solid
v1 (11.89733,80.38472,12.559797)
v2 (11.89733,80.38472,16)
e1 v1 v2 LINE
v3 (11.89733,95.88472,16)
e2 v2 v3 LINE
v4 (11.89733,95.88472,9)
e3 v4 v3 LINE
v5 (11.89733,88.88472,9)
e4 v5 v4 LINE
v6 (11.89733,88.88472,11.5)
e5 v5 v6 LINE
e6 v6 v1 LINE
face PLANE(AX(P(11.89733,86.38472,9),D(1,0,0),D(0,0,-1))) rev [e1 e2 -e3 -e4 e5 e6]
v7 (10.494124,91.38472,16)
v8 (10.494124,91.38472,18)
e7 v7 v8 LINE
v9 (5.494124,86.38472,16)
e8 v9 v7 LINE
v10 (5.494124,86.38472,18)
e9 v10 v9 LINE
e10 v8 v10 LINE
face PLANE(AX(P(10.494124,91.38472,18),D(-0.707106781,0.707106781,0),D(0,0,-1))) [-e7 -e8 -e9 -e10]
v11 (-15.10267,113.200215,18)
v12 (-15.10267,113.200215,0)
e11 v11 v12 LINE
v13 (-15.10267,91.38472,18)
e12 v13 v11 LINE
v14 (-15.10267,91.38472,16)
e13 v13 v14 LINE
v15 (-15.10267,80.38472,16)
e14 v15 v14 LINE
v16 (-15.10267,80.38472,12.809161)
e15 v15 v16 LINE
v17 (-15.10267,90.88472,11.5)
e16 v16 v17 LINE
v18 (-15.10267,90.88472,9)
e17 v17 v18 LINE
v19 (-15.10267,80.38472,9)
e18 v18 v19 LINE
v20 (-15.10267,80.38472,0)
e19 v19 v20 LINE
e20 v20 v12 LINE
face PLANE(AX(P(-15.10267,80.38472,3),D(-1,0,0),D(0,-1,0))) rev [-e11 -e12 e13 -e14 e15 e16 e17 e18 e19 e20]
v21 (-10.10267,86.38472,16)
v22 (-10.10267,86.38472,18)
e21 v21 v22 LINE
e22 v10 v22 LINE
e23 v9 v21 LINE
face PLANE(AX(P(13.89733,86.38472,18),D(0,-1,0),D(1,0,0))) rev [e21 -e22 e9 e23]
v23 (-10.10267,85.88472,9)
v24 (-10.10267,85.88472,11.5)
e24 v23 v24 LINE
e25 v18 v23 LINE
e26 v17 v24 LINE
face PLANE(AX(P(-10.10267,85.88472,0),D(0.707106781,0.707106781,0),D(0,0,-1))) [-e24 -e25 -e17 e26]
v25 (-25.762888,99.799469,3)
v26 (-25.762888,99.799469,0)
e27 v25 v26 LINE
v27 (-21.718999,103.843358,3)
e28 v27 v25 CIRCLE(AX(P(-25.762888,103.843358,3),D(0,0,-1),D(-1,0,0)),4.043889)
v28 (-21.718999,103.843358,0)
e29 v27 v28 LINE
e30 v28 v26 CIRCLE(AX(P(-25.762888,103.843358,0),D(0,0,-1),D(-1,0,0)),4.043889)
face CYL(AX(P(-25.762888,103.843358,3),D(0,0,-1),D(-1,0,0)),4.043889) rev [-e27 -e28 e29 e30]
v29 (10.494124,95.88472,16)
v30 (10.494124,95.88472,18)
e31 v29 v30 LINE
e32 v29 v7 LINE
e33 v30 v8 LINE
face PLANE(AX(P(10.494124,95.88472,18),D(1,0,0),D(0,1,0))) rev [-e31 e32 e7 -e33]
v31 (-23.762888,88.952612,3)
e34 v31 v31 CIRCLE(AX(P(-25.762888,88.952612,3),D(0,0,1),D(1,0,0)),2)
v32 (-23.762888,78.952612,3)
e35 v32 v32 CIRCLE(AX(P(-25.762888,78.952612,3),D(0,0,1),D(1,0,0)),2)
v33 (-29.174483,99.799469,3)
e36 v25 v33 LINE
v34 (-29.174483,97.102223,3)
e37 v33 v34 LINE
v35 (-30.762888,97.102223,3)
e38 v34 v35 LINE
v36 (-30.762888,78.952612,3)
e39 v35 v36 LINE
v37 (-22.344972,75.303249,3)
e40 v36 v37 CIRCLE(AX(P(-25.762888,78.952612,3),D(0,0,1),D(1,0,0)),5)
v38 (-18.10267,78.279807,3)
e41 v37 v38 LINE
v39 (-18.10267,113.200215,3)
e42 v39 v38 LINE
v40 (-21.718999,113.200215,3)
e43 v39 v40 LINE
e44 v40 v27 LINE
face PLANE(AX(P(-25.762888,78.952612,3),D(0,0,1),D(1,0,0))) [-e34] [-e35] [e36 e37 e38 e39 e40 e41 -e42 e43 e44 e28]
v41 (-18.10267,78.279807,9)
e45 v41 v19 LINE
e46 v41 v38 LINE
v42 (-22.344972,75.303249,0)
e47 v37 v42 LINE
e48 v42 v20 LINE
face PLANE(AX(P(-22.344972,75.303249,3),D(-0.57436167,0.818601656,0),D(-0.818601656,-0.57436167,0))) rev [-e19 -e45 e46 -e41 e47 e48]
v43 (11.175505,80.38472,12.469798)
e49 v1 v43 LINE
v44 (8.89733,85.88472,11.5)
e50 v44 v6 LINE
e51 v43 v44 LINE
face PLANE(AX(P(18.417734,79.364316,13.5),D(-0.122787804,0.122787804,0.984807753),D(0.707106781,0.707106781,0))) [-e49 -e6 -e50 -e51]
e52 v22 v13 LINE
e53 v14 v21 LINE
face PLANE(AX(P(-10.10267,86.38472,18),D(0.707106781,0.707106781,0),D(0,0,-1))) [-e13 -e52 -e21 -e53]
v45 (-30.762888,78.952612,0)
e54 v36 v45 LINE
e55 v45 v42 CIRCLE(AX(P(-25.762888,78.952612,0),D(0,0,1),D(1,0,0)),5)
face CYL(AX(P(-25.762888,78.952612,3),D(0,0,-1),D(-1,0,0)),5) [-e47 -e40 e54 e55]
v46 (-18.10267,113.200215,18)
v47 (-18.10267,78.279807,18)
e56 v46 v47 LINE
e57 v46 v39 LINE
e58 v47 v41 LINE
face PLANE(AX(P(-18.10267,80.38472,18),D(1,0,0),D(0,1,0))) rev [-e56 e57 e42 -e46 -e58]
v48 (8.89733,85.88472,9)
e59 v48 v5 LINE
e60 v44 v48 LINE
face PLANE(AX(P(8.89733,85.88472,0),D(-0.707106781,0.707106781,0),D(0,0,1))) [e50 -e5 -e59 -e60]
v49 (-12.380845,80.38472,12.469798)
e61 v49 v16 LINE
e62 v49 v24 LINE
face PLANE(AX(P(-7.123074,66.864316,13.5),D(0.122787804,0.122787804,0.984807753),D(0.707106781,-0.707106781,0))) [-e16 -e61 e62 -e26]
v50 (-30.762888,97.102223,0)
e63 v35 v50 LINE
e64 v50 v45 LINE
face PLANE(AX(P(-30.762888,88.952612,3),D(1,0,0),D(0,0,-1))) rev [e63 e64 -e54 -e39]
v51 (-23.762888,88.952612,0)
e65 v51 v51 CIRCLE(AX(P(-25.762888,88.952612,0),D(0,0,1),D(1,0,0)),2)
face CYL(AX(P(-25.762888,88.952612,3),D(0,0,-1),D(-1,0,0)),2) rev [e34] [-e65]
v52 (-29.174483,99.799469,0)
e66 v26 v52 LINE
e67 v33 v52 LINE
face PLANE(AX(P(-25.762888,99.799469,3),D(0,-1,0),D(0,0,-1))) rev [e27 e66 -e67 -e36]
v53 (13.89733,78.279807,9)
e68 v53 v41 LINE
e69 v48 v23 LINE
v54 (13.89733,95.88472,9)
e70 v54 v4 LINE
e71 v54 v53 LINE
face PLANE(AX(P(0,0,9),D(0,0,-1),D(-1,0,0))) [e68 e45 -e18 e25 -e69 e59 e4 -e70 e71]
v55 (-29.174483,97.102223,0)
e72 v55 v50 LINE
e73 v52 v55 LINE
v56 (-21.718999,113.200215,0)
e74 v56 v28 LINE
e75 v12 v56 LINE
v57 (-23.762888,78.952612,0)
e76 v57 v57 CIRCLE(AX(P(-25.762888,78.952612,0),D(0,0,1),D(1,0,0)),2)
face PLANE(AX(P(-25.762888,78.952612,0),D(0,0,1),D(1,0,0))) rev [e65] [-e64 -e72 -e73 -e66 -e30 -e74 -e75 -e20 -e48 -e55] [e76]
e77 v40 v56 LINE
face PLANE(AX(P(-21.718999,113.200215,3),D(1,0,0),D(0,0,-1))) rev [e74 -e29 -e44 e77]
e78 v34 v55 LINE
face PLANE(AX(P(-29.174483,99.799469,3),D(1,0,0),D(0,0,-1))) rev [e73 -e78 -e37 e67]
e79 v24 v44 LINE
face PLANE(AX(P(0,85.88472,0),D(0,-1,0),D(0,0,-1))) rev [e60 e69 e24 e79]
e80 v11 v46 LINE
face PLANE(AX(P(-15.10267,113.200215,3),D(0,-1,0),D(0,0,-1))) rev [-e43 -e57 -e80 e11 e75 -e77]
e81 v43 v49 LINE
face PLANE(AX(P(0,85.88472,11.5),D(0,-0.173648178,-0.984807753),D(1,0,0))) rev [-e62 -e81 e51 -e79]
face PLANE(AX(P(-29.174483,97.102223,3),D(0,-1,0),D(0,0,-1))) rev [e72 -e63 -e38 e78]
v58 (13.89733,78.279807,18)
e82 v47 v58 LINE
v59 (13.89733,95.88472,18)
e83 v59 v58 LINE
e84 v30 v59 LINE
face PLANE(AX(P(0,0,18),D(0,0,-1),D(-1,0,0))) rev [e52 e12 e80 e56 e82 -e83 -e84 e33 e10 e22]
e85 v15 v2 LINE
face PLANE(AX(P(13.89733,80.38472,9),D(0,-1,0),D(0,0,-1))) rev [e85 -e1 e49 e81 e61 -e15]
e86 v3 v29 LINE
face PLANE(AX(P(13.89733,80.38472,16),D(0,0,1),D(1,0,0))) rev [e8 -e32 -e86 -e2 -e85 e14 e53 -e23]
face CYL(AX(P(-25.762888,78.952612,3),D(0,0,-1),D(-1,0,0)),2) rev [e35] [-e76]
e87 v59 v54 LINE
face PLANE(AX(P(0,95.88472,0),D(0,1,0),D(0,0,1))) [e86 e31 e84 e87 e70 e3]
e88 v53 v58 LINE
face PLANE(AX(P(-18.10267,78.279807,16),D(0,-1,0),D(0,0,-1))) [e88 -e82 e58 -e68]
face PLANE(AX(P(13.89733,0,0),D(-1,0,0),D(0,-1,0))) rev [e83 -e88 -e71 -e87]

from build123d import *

# Parameters (mm, degrees)
SKETCH_1_R       = 2
EXTRUDE_1_DEPTH  = 3
EXTRUDE_2_DEPTH  = 15
SKETCH_3_W       = 2
SKETCH_3_H       = 6
EXTRUDE_3_DEPTH  = 29
SKETCH_5_W       = 2
SKETCH_5_H       = 6
EXTRUDE_4_DEPTH  = 7
SKETCH_6_W       = 32
SKETCH_6_H       = 7
EXTRUDE_5_DEPTH  = 2
CHAMFER_1_SIZE   = 5
SKETCH_8_W       = 32
SKETCH_8_H       = 2.104912686
EXTRUDE_6_DEPTH  = 7
SKETCH_9_W       = 27
SKETCH_9_H       = 4.5
EXTRUDE_7_DEPTH  = 5.5
CHAMFER_2_SIZE   = 5
EXTRUDE_8_DEPTH  = 9.5
CHAMFER_3_SIZE   = 5
CHAMFER_4_SIZE   = 3
CHAMFER_6_SIZE   = 2
CHAMFER_6_SIZE_2 = 11.342563639


with BuildPart() as part:
    # 草图1 → 凸台-拉伸1 (new body)
    with BuildSketch(Plane.XY):
        with BuildLine():
            Line((-22.344972157, 75.303248777), (-15.102670088, 80.384719944))
            Line((-15.102670088, 80.384719944), (-15.102670088, 113.200215401))
            Line((-15.102670088, 113.200215401), (-21.718999147, 113.200215401))
            Line((-21.718999147, 113.200215401), (-21.718999147, 103.843357559))
            ThreePointArc((-21.718999147, 103.843357559), (-22.903426745, 100.983896387), (-25.762887917, 99.799468789))
            Line((-25.762887917, 99.799468789), (-29.17448261, 99.799468789))
            Line((-29.17448261, 99.799468789), (-29.17448261, 97.102223458))
            Line((-29.17448261, 97.102223458), (-30.762887917, 97.102223458))
            Line((-30.762887917, 97.102223458), (-30.762887917, 88.952611989))
            Line((-30.762887917, 88.952611989), (-30.762887917, 78.952611989))
            ThreePointArc((-30.762887917, 78.952611989), (-27.751659045, 74.365151973), (-22.344972157, 75.303248777))
        make_face()
        with Locations((-25.762887917, 88.952611989)):
            Circle(SKETCH_1_R, mode=Mode.SUBTRACT)
        with Locations((-25.762887917, 78.952611989)):
            Circle(SKETCH_1_R, mode=Mode.SUBTRACT)
    extrude(amount=EXTRUDE_1_DEPTH)

    # 草图2 → 凸台-拉伸2 (add)
    with BuildSketch(Plane.XY.offset(3)):
        Polygon((-18.102670088, 80.384719944), (-18.102670088, 78.279807258), (-15.102670088, 80.384719944), (-15.102670088, 113.200215401), (-18.102670088, 113.200215401), align=None)
    extrude(amount=EXTRUDE_2_DEPTH)

    # 草图3 → 凸台-拉伸3 (add)
    with BuildSketch(Plane(origin=(-15.102670088, 0, 0), x_dir=(0, 0, -1), z_dir=(1, 0, 0))):
        with Locations((-17, 83.384719944)):
            Rectangle(SKETCH_3_W, SKETCH_3_H)
    extrude(amount=EXTRUDE_3_DEPTH)

    # 草图5 → 凸台-拉伸4 (add)
    with BuildSketch(Plane(origin=(0, 0, 16), x_dir=(-1, 0, 0), z_dir=(0, 0, -1))):
        with Locations((-12.897329912, 83.384719944)):
            Rectangle(SKETCH_5_W, SKETCH_5_H)
    extrude(amount=EXTRUDE_4_DEPTH)

    # 草图6 → 凸台-拉伸5 (add)
    with BuildSketch(Plane.XY.offset(18)):
        with Locations((-2.102670088, 81.779807258)):
            Rectangle(SKETCH_6_W, SKETCH_6_H)
    extrude(amount=-EXTRUDE_5_DEPTH)

    # 倒角1
    chamfer_1_edges = [part.edges().sort_by_distance(p)[0] for p in [
        (-15.102670088, 86.384719944, 17),
    ]]
    chamfer(chamfer_1_edges, length=CHAMFER_1_SIZE)

    # 草图8 → 凸台-拉伸6 (add)
    with BuildSketch(Plane(origin=(0, 0, 16), x_dir=(-1, 0, 0), z_dir=(0, 0, -1))):
        with Locations((2.102670088, 79.332263601)):
            Rectangle(SKETCH_8_W, SKETCH_8_H)
    extrude(amount=EXTRUDE_6_DEPTH)

    # 草图9 → 凸台-拉伸7 (add)
    with BuildSketch(Plane(origin=(0, 80.384719944, 0), x_dir=(1, 0, 0), z_dir=(0, 1, 0))):
        with Locations((-1.602670088, -11.25)):
            Rectangle(SKETCH_9_W, SKETCH_9_H)
    extrude(amount=EXTRUDE_7_DEPTH)

    # 倒角2
    chamfer_2_edges = [part.edges().sort_by_distance(p)[0] for p in [
        (-15.102670088, 85.884719944, 11.25),
    ]]
    chamfer(chamfer_2_edges, length=CHAMFER_2_SIZE)

    # 草图10 → 凸台-拉伸8 (add)
    with BuildSketch(Plane(origin=(0, 86.384719944, 0), x_dir=(1, 0, 0), z_dir=(0, 1, 0))):
        Polygon((11.897329912, -9), (11.897329912, -16), (10.494123617, -16), (10.494123617, -18), (11.897329912, -18), (13.897329912, -18), (13.897329912, -9), align=None)
    extrude(amount=EXTRUDE_8_DEPTH)

    # 倒角3
    chamfer_3_edges = [part.edges().sort_by_distance(p)[0] for p in [
        (10.494123617, 86.384719944, 17),
    ]]
    chamfer(chamfer_3_edges, length=CHAMFER_3_SIZE)

    # 倒角4
    chamfer_4_edges = [part.edges().sort_by_distance(p)[0] for p in [
        (11.897329912, 85.884719944, 11.25),
    ]]
    chamfer(chamfer_4_edges, length=CHAMFER_4_SIZE)

    # 倒角6
    # the kernel refuses this chamfer: 11.342563639, 2 mm, written as the material it takes off along each edge
    with BuildSketch(Plane(origin=(-35.944000175, 111.726050031, 13.5), x_dir=(0, 0, -1), z_dir=(0.7071067811865472, -0.7071067811865478, 0))) as chamfer_6_piece_1_section:
        Polygon((CHAMFER_6_SIZE, 0), (0, -CHAMFER_6_SIZE_2), (0, 0), align=None)
    chamfer_6_piece_1 = extrude(amount=66.019251147, mode=Mode.PRIVATE)
    chamfer_6_piece_1 = split(chamfer_6_piece_1, bisect_by=Plane(origin=(-15.102670088, 111.726050031, 13.5), z_dir=(1, 0, 0)), keep=Keep.TOP, mode=Mode.PRIVATE)
    chamfer_6_piece_1 = split(chamfer_6_piece_1, bisect_by=Plane(origin=(-35.944000175, 80.384719944, 13.5), z_dir=(0, 1, 0)), keep=Keep.TOP, mode=Mode.PRIVATE)
    chamfer_6_piece_1 = split(chamfer_6_piece_1, bisect_by=Plane(origin=(-35.944000175, 110.604818441, 7.141179669), z_dir=(0, 0.17364817766692733, 0.9848077530122086)), keep=Keep.TOP, mode=Mode.PRIVATE)
    add(chamfer_6_piece_1, mode=Mode.SUBTRACT)
    with BuildSketch(Plane(origin=(-39.576761755, 85.884719944, 13.5), x_dir=(0, 0, -1), z_dir=(1, 0, 0))) as chamfer_6_piece_2_section:
        Polygon((CHAMFER_6_SIZE, 0), (0, -CHAMFER_6_SIZE_2), (0, 0), align=None)
    chamfer_6_piece_2 = extrude(amount=77.948183335, mode=Mode.PRIVATE)
    chamfer_6_piece_2 = split(chamfer_6_piece_2, bisect_by=Plane(origin=(11.897329912, 85.884719944, 13.5), z_dir=(-1, 0, 0)), keep=Keep.TOP, mode=Mode.PRIVATE)
    chamfer_6_piece_2 = split(chamfer_6_piece_2, bisect_by=Plane(origin=(-15.102670088, 85.884719944, 13.5), z_dir=(1, 0, 0)), keep=Keep.TOP, mode=Mode.PRIVATE)
    chamfer_6_piece_2 = split(chamfer_6_piece_2, bisect_by=Plane(origin=(-39.576761755, 80.384719944, 13.5), z_dir=(0, 1, 0)), keep=Keep.TOP, mode=Mode.PRIVATE)
    chamfer_6_piece_2 = split(chamfer_6_piece_2, bisect_by=Plane(origin=(-39.374230212, 86.087251487, 15.124384731), z_dir=(0.12278780396897075, 0.12278780396897053, 0.9848077530122088)), keep=Keep.TOP, mode=Mode.PRIVATE)
    chamfer_6_piece_2 = split(chamfer_6_piece_2, bisect_by=Plane(origin=(-38.604080635, 84.912038824, 5.698704782), z_dir=(-0.12278780396897096, 0.12278780396897111, 0.9848077530122086)), keep=Keep.TOP, mode=Mode.PRIVATE)
    add(chamfer_6_piece_2, mode=Mode.SUBTRACT)
    with BuildSketch(Plane(origin=(32.73866, 109.726050031, 13.5), x_dir=(0.7071067811865475, -0.7071067811865475, 0), z_dir=(-0.7071067811865476, -0.7071067811865476, 0))) as chamfer_6_piece_3_section:
        Polygon((CHAMFER_6_SIZE_2, 0), (0, -CHAMFER_6_SIZE), (0, 0), align=None)
    chamfer_6_piece_3 = extrude(amount=63.190824022, mode=Mode.PRIVATE)
    chamfer_6_piece_3 = split(chamfer_6_piece_3, bisect_by=Plane(origin=(11.897329912, 109.726050031, 13.5), z_dir=(-1, 0, 0)), keep=Keep.TOP, mode=Mode.PRIVATE)
    chamfer_6_piece_3 = split(chamfer_6_piece_3, bisect_by=Plane(origin=(32.73866, 80.384719944, 13.5), z_dir=(0, 1, 0)), keep=Keep.TOP, mode=Mode.PRIVATE)
    chamfer_6_piece_3 = split(chamfer_6_piece_3, bisect_by=Plane(origin=(32.73866, 108.665125821, 7.483199812), z_dir=(0, 0.17364817766692733, 0.9848077530122086)), keep=Keep.TOP, mode=Mode.PRIVATE)
    add(chamfer_6_piece_3, mode=Mode.SUBTRACT)


solid = part.part
